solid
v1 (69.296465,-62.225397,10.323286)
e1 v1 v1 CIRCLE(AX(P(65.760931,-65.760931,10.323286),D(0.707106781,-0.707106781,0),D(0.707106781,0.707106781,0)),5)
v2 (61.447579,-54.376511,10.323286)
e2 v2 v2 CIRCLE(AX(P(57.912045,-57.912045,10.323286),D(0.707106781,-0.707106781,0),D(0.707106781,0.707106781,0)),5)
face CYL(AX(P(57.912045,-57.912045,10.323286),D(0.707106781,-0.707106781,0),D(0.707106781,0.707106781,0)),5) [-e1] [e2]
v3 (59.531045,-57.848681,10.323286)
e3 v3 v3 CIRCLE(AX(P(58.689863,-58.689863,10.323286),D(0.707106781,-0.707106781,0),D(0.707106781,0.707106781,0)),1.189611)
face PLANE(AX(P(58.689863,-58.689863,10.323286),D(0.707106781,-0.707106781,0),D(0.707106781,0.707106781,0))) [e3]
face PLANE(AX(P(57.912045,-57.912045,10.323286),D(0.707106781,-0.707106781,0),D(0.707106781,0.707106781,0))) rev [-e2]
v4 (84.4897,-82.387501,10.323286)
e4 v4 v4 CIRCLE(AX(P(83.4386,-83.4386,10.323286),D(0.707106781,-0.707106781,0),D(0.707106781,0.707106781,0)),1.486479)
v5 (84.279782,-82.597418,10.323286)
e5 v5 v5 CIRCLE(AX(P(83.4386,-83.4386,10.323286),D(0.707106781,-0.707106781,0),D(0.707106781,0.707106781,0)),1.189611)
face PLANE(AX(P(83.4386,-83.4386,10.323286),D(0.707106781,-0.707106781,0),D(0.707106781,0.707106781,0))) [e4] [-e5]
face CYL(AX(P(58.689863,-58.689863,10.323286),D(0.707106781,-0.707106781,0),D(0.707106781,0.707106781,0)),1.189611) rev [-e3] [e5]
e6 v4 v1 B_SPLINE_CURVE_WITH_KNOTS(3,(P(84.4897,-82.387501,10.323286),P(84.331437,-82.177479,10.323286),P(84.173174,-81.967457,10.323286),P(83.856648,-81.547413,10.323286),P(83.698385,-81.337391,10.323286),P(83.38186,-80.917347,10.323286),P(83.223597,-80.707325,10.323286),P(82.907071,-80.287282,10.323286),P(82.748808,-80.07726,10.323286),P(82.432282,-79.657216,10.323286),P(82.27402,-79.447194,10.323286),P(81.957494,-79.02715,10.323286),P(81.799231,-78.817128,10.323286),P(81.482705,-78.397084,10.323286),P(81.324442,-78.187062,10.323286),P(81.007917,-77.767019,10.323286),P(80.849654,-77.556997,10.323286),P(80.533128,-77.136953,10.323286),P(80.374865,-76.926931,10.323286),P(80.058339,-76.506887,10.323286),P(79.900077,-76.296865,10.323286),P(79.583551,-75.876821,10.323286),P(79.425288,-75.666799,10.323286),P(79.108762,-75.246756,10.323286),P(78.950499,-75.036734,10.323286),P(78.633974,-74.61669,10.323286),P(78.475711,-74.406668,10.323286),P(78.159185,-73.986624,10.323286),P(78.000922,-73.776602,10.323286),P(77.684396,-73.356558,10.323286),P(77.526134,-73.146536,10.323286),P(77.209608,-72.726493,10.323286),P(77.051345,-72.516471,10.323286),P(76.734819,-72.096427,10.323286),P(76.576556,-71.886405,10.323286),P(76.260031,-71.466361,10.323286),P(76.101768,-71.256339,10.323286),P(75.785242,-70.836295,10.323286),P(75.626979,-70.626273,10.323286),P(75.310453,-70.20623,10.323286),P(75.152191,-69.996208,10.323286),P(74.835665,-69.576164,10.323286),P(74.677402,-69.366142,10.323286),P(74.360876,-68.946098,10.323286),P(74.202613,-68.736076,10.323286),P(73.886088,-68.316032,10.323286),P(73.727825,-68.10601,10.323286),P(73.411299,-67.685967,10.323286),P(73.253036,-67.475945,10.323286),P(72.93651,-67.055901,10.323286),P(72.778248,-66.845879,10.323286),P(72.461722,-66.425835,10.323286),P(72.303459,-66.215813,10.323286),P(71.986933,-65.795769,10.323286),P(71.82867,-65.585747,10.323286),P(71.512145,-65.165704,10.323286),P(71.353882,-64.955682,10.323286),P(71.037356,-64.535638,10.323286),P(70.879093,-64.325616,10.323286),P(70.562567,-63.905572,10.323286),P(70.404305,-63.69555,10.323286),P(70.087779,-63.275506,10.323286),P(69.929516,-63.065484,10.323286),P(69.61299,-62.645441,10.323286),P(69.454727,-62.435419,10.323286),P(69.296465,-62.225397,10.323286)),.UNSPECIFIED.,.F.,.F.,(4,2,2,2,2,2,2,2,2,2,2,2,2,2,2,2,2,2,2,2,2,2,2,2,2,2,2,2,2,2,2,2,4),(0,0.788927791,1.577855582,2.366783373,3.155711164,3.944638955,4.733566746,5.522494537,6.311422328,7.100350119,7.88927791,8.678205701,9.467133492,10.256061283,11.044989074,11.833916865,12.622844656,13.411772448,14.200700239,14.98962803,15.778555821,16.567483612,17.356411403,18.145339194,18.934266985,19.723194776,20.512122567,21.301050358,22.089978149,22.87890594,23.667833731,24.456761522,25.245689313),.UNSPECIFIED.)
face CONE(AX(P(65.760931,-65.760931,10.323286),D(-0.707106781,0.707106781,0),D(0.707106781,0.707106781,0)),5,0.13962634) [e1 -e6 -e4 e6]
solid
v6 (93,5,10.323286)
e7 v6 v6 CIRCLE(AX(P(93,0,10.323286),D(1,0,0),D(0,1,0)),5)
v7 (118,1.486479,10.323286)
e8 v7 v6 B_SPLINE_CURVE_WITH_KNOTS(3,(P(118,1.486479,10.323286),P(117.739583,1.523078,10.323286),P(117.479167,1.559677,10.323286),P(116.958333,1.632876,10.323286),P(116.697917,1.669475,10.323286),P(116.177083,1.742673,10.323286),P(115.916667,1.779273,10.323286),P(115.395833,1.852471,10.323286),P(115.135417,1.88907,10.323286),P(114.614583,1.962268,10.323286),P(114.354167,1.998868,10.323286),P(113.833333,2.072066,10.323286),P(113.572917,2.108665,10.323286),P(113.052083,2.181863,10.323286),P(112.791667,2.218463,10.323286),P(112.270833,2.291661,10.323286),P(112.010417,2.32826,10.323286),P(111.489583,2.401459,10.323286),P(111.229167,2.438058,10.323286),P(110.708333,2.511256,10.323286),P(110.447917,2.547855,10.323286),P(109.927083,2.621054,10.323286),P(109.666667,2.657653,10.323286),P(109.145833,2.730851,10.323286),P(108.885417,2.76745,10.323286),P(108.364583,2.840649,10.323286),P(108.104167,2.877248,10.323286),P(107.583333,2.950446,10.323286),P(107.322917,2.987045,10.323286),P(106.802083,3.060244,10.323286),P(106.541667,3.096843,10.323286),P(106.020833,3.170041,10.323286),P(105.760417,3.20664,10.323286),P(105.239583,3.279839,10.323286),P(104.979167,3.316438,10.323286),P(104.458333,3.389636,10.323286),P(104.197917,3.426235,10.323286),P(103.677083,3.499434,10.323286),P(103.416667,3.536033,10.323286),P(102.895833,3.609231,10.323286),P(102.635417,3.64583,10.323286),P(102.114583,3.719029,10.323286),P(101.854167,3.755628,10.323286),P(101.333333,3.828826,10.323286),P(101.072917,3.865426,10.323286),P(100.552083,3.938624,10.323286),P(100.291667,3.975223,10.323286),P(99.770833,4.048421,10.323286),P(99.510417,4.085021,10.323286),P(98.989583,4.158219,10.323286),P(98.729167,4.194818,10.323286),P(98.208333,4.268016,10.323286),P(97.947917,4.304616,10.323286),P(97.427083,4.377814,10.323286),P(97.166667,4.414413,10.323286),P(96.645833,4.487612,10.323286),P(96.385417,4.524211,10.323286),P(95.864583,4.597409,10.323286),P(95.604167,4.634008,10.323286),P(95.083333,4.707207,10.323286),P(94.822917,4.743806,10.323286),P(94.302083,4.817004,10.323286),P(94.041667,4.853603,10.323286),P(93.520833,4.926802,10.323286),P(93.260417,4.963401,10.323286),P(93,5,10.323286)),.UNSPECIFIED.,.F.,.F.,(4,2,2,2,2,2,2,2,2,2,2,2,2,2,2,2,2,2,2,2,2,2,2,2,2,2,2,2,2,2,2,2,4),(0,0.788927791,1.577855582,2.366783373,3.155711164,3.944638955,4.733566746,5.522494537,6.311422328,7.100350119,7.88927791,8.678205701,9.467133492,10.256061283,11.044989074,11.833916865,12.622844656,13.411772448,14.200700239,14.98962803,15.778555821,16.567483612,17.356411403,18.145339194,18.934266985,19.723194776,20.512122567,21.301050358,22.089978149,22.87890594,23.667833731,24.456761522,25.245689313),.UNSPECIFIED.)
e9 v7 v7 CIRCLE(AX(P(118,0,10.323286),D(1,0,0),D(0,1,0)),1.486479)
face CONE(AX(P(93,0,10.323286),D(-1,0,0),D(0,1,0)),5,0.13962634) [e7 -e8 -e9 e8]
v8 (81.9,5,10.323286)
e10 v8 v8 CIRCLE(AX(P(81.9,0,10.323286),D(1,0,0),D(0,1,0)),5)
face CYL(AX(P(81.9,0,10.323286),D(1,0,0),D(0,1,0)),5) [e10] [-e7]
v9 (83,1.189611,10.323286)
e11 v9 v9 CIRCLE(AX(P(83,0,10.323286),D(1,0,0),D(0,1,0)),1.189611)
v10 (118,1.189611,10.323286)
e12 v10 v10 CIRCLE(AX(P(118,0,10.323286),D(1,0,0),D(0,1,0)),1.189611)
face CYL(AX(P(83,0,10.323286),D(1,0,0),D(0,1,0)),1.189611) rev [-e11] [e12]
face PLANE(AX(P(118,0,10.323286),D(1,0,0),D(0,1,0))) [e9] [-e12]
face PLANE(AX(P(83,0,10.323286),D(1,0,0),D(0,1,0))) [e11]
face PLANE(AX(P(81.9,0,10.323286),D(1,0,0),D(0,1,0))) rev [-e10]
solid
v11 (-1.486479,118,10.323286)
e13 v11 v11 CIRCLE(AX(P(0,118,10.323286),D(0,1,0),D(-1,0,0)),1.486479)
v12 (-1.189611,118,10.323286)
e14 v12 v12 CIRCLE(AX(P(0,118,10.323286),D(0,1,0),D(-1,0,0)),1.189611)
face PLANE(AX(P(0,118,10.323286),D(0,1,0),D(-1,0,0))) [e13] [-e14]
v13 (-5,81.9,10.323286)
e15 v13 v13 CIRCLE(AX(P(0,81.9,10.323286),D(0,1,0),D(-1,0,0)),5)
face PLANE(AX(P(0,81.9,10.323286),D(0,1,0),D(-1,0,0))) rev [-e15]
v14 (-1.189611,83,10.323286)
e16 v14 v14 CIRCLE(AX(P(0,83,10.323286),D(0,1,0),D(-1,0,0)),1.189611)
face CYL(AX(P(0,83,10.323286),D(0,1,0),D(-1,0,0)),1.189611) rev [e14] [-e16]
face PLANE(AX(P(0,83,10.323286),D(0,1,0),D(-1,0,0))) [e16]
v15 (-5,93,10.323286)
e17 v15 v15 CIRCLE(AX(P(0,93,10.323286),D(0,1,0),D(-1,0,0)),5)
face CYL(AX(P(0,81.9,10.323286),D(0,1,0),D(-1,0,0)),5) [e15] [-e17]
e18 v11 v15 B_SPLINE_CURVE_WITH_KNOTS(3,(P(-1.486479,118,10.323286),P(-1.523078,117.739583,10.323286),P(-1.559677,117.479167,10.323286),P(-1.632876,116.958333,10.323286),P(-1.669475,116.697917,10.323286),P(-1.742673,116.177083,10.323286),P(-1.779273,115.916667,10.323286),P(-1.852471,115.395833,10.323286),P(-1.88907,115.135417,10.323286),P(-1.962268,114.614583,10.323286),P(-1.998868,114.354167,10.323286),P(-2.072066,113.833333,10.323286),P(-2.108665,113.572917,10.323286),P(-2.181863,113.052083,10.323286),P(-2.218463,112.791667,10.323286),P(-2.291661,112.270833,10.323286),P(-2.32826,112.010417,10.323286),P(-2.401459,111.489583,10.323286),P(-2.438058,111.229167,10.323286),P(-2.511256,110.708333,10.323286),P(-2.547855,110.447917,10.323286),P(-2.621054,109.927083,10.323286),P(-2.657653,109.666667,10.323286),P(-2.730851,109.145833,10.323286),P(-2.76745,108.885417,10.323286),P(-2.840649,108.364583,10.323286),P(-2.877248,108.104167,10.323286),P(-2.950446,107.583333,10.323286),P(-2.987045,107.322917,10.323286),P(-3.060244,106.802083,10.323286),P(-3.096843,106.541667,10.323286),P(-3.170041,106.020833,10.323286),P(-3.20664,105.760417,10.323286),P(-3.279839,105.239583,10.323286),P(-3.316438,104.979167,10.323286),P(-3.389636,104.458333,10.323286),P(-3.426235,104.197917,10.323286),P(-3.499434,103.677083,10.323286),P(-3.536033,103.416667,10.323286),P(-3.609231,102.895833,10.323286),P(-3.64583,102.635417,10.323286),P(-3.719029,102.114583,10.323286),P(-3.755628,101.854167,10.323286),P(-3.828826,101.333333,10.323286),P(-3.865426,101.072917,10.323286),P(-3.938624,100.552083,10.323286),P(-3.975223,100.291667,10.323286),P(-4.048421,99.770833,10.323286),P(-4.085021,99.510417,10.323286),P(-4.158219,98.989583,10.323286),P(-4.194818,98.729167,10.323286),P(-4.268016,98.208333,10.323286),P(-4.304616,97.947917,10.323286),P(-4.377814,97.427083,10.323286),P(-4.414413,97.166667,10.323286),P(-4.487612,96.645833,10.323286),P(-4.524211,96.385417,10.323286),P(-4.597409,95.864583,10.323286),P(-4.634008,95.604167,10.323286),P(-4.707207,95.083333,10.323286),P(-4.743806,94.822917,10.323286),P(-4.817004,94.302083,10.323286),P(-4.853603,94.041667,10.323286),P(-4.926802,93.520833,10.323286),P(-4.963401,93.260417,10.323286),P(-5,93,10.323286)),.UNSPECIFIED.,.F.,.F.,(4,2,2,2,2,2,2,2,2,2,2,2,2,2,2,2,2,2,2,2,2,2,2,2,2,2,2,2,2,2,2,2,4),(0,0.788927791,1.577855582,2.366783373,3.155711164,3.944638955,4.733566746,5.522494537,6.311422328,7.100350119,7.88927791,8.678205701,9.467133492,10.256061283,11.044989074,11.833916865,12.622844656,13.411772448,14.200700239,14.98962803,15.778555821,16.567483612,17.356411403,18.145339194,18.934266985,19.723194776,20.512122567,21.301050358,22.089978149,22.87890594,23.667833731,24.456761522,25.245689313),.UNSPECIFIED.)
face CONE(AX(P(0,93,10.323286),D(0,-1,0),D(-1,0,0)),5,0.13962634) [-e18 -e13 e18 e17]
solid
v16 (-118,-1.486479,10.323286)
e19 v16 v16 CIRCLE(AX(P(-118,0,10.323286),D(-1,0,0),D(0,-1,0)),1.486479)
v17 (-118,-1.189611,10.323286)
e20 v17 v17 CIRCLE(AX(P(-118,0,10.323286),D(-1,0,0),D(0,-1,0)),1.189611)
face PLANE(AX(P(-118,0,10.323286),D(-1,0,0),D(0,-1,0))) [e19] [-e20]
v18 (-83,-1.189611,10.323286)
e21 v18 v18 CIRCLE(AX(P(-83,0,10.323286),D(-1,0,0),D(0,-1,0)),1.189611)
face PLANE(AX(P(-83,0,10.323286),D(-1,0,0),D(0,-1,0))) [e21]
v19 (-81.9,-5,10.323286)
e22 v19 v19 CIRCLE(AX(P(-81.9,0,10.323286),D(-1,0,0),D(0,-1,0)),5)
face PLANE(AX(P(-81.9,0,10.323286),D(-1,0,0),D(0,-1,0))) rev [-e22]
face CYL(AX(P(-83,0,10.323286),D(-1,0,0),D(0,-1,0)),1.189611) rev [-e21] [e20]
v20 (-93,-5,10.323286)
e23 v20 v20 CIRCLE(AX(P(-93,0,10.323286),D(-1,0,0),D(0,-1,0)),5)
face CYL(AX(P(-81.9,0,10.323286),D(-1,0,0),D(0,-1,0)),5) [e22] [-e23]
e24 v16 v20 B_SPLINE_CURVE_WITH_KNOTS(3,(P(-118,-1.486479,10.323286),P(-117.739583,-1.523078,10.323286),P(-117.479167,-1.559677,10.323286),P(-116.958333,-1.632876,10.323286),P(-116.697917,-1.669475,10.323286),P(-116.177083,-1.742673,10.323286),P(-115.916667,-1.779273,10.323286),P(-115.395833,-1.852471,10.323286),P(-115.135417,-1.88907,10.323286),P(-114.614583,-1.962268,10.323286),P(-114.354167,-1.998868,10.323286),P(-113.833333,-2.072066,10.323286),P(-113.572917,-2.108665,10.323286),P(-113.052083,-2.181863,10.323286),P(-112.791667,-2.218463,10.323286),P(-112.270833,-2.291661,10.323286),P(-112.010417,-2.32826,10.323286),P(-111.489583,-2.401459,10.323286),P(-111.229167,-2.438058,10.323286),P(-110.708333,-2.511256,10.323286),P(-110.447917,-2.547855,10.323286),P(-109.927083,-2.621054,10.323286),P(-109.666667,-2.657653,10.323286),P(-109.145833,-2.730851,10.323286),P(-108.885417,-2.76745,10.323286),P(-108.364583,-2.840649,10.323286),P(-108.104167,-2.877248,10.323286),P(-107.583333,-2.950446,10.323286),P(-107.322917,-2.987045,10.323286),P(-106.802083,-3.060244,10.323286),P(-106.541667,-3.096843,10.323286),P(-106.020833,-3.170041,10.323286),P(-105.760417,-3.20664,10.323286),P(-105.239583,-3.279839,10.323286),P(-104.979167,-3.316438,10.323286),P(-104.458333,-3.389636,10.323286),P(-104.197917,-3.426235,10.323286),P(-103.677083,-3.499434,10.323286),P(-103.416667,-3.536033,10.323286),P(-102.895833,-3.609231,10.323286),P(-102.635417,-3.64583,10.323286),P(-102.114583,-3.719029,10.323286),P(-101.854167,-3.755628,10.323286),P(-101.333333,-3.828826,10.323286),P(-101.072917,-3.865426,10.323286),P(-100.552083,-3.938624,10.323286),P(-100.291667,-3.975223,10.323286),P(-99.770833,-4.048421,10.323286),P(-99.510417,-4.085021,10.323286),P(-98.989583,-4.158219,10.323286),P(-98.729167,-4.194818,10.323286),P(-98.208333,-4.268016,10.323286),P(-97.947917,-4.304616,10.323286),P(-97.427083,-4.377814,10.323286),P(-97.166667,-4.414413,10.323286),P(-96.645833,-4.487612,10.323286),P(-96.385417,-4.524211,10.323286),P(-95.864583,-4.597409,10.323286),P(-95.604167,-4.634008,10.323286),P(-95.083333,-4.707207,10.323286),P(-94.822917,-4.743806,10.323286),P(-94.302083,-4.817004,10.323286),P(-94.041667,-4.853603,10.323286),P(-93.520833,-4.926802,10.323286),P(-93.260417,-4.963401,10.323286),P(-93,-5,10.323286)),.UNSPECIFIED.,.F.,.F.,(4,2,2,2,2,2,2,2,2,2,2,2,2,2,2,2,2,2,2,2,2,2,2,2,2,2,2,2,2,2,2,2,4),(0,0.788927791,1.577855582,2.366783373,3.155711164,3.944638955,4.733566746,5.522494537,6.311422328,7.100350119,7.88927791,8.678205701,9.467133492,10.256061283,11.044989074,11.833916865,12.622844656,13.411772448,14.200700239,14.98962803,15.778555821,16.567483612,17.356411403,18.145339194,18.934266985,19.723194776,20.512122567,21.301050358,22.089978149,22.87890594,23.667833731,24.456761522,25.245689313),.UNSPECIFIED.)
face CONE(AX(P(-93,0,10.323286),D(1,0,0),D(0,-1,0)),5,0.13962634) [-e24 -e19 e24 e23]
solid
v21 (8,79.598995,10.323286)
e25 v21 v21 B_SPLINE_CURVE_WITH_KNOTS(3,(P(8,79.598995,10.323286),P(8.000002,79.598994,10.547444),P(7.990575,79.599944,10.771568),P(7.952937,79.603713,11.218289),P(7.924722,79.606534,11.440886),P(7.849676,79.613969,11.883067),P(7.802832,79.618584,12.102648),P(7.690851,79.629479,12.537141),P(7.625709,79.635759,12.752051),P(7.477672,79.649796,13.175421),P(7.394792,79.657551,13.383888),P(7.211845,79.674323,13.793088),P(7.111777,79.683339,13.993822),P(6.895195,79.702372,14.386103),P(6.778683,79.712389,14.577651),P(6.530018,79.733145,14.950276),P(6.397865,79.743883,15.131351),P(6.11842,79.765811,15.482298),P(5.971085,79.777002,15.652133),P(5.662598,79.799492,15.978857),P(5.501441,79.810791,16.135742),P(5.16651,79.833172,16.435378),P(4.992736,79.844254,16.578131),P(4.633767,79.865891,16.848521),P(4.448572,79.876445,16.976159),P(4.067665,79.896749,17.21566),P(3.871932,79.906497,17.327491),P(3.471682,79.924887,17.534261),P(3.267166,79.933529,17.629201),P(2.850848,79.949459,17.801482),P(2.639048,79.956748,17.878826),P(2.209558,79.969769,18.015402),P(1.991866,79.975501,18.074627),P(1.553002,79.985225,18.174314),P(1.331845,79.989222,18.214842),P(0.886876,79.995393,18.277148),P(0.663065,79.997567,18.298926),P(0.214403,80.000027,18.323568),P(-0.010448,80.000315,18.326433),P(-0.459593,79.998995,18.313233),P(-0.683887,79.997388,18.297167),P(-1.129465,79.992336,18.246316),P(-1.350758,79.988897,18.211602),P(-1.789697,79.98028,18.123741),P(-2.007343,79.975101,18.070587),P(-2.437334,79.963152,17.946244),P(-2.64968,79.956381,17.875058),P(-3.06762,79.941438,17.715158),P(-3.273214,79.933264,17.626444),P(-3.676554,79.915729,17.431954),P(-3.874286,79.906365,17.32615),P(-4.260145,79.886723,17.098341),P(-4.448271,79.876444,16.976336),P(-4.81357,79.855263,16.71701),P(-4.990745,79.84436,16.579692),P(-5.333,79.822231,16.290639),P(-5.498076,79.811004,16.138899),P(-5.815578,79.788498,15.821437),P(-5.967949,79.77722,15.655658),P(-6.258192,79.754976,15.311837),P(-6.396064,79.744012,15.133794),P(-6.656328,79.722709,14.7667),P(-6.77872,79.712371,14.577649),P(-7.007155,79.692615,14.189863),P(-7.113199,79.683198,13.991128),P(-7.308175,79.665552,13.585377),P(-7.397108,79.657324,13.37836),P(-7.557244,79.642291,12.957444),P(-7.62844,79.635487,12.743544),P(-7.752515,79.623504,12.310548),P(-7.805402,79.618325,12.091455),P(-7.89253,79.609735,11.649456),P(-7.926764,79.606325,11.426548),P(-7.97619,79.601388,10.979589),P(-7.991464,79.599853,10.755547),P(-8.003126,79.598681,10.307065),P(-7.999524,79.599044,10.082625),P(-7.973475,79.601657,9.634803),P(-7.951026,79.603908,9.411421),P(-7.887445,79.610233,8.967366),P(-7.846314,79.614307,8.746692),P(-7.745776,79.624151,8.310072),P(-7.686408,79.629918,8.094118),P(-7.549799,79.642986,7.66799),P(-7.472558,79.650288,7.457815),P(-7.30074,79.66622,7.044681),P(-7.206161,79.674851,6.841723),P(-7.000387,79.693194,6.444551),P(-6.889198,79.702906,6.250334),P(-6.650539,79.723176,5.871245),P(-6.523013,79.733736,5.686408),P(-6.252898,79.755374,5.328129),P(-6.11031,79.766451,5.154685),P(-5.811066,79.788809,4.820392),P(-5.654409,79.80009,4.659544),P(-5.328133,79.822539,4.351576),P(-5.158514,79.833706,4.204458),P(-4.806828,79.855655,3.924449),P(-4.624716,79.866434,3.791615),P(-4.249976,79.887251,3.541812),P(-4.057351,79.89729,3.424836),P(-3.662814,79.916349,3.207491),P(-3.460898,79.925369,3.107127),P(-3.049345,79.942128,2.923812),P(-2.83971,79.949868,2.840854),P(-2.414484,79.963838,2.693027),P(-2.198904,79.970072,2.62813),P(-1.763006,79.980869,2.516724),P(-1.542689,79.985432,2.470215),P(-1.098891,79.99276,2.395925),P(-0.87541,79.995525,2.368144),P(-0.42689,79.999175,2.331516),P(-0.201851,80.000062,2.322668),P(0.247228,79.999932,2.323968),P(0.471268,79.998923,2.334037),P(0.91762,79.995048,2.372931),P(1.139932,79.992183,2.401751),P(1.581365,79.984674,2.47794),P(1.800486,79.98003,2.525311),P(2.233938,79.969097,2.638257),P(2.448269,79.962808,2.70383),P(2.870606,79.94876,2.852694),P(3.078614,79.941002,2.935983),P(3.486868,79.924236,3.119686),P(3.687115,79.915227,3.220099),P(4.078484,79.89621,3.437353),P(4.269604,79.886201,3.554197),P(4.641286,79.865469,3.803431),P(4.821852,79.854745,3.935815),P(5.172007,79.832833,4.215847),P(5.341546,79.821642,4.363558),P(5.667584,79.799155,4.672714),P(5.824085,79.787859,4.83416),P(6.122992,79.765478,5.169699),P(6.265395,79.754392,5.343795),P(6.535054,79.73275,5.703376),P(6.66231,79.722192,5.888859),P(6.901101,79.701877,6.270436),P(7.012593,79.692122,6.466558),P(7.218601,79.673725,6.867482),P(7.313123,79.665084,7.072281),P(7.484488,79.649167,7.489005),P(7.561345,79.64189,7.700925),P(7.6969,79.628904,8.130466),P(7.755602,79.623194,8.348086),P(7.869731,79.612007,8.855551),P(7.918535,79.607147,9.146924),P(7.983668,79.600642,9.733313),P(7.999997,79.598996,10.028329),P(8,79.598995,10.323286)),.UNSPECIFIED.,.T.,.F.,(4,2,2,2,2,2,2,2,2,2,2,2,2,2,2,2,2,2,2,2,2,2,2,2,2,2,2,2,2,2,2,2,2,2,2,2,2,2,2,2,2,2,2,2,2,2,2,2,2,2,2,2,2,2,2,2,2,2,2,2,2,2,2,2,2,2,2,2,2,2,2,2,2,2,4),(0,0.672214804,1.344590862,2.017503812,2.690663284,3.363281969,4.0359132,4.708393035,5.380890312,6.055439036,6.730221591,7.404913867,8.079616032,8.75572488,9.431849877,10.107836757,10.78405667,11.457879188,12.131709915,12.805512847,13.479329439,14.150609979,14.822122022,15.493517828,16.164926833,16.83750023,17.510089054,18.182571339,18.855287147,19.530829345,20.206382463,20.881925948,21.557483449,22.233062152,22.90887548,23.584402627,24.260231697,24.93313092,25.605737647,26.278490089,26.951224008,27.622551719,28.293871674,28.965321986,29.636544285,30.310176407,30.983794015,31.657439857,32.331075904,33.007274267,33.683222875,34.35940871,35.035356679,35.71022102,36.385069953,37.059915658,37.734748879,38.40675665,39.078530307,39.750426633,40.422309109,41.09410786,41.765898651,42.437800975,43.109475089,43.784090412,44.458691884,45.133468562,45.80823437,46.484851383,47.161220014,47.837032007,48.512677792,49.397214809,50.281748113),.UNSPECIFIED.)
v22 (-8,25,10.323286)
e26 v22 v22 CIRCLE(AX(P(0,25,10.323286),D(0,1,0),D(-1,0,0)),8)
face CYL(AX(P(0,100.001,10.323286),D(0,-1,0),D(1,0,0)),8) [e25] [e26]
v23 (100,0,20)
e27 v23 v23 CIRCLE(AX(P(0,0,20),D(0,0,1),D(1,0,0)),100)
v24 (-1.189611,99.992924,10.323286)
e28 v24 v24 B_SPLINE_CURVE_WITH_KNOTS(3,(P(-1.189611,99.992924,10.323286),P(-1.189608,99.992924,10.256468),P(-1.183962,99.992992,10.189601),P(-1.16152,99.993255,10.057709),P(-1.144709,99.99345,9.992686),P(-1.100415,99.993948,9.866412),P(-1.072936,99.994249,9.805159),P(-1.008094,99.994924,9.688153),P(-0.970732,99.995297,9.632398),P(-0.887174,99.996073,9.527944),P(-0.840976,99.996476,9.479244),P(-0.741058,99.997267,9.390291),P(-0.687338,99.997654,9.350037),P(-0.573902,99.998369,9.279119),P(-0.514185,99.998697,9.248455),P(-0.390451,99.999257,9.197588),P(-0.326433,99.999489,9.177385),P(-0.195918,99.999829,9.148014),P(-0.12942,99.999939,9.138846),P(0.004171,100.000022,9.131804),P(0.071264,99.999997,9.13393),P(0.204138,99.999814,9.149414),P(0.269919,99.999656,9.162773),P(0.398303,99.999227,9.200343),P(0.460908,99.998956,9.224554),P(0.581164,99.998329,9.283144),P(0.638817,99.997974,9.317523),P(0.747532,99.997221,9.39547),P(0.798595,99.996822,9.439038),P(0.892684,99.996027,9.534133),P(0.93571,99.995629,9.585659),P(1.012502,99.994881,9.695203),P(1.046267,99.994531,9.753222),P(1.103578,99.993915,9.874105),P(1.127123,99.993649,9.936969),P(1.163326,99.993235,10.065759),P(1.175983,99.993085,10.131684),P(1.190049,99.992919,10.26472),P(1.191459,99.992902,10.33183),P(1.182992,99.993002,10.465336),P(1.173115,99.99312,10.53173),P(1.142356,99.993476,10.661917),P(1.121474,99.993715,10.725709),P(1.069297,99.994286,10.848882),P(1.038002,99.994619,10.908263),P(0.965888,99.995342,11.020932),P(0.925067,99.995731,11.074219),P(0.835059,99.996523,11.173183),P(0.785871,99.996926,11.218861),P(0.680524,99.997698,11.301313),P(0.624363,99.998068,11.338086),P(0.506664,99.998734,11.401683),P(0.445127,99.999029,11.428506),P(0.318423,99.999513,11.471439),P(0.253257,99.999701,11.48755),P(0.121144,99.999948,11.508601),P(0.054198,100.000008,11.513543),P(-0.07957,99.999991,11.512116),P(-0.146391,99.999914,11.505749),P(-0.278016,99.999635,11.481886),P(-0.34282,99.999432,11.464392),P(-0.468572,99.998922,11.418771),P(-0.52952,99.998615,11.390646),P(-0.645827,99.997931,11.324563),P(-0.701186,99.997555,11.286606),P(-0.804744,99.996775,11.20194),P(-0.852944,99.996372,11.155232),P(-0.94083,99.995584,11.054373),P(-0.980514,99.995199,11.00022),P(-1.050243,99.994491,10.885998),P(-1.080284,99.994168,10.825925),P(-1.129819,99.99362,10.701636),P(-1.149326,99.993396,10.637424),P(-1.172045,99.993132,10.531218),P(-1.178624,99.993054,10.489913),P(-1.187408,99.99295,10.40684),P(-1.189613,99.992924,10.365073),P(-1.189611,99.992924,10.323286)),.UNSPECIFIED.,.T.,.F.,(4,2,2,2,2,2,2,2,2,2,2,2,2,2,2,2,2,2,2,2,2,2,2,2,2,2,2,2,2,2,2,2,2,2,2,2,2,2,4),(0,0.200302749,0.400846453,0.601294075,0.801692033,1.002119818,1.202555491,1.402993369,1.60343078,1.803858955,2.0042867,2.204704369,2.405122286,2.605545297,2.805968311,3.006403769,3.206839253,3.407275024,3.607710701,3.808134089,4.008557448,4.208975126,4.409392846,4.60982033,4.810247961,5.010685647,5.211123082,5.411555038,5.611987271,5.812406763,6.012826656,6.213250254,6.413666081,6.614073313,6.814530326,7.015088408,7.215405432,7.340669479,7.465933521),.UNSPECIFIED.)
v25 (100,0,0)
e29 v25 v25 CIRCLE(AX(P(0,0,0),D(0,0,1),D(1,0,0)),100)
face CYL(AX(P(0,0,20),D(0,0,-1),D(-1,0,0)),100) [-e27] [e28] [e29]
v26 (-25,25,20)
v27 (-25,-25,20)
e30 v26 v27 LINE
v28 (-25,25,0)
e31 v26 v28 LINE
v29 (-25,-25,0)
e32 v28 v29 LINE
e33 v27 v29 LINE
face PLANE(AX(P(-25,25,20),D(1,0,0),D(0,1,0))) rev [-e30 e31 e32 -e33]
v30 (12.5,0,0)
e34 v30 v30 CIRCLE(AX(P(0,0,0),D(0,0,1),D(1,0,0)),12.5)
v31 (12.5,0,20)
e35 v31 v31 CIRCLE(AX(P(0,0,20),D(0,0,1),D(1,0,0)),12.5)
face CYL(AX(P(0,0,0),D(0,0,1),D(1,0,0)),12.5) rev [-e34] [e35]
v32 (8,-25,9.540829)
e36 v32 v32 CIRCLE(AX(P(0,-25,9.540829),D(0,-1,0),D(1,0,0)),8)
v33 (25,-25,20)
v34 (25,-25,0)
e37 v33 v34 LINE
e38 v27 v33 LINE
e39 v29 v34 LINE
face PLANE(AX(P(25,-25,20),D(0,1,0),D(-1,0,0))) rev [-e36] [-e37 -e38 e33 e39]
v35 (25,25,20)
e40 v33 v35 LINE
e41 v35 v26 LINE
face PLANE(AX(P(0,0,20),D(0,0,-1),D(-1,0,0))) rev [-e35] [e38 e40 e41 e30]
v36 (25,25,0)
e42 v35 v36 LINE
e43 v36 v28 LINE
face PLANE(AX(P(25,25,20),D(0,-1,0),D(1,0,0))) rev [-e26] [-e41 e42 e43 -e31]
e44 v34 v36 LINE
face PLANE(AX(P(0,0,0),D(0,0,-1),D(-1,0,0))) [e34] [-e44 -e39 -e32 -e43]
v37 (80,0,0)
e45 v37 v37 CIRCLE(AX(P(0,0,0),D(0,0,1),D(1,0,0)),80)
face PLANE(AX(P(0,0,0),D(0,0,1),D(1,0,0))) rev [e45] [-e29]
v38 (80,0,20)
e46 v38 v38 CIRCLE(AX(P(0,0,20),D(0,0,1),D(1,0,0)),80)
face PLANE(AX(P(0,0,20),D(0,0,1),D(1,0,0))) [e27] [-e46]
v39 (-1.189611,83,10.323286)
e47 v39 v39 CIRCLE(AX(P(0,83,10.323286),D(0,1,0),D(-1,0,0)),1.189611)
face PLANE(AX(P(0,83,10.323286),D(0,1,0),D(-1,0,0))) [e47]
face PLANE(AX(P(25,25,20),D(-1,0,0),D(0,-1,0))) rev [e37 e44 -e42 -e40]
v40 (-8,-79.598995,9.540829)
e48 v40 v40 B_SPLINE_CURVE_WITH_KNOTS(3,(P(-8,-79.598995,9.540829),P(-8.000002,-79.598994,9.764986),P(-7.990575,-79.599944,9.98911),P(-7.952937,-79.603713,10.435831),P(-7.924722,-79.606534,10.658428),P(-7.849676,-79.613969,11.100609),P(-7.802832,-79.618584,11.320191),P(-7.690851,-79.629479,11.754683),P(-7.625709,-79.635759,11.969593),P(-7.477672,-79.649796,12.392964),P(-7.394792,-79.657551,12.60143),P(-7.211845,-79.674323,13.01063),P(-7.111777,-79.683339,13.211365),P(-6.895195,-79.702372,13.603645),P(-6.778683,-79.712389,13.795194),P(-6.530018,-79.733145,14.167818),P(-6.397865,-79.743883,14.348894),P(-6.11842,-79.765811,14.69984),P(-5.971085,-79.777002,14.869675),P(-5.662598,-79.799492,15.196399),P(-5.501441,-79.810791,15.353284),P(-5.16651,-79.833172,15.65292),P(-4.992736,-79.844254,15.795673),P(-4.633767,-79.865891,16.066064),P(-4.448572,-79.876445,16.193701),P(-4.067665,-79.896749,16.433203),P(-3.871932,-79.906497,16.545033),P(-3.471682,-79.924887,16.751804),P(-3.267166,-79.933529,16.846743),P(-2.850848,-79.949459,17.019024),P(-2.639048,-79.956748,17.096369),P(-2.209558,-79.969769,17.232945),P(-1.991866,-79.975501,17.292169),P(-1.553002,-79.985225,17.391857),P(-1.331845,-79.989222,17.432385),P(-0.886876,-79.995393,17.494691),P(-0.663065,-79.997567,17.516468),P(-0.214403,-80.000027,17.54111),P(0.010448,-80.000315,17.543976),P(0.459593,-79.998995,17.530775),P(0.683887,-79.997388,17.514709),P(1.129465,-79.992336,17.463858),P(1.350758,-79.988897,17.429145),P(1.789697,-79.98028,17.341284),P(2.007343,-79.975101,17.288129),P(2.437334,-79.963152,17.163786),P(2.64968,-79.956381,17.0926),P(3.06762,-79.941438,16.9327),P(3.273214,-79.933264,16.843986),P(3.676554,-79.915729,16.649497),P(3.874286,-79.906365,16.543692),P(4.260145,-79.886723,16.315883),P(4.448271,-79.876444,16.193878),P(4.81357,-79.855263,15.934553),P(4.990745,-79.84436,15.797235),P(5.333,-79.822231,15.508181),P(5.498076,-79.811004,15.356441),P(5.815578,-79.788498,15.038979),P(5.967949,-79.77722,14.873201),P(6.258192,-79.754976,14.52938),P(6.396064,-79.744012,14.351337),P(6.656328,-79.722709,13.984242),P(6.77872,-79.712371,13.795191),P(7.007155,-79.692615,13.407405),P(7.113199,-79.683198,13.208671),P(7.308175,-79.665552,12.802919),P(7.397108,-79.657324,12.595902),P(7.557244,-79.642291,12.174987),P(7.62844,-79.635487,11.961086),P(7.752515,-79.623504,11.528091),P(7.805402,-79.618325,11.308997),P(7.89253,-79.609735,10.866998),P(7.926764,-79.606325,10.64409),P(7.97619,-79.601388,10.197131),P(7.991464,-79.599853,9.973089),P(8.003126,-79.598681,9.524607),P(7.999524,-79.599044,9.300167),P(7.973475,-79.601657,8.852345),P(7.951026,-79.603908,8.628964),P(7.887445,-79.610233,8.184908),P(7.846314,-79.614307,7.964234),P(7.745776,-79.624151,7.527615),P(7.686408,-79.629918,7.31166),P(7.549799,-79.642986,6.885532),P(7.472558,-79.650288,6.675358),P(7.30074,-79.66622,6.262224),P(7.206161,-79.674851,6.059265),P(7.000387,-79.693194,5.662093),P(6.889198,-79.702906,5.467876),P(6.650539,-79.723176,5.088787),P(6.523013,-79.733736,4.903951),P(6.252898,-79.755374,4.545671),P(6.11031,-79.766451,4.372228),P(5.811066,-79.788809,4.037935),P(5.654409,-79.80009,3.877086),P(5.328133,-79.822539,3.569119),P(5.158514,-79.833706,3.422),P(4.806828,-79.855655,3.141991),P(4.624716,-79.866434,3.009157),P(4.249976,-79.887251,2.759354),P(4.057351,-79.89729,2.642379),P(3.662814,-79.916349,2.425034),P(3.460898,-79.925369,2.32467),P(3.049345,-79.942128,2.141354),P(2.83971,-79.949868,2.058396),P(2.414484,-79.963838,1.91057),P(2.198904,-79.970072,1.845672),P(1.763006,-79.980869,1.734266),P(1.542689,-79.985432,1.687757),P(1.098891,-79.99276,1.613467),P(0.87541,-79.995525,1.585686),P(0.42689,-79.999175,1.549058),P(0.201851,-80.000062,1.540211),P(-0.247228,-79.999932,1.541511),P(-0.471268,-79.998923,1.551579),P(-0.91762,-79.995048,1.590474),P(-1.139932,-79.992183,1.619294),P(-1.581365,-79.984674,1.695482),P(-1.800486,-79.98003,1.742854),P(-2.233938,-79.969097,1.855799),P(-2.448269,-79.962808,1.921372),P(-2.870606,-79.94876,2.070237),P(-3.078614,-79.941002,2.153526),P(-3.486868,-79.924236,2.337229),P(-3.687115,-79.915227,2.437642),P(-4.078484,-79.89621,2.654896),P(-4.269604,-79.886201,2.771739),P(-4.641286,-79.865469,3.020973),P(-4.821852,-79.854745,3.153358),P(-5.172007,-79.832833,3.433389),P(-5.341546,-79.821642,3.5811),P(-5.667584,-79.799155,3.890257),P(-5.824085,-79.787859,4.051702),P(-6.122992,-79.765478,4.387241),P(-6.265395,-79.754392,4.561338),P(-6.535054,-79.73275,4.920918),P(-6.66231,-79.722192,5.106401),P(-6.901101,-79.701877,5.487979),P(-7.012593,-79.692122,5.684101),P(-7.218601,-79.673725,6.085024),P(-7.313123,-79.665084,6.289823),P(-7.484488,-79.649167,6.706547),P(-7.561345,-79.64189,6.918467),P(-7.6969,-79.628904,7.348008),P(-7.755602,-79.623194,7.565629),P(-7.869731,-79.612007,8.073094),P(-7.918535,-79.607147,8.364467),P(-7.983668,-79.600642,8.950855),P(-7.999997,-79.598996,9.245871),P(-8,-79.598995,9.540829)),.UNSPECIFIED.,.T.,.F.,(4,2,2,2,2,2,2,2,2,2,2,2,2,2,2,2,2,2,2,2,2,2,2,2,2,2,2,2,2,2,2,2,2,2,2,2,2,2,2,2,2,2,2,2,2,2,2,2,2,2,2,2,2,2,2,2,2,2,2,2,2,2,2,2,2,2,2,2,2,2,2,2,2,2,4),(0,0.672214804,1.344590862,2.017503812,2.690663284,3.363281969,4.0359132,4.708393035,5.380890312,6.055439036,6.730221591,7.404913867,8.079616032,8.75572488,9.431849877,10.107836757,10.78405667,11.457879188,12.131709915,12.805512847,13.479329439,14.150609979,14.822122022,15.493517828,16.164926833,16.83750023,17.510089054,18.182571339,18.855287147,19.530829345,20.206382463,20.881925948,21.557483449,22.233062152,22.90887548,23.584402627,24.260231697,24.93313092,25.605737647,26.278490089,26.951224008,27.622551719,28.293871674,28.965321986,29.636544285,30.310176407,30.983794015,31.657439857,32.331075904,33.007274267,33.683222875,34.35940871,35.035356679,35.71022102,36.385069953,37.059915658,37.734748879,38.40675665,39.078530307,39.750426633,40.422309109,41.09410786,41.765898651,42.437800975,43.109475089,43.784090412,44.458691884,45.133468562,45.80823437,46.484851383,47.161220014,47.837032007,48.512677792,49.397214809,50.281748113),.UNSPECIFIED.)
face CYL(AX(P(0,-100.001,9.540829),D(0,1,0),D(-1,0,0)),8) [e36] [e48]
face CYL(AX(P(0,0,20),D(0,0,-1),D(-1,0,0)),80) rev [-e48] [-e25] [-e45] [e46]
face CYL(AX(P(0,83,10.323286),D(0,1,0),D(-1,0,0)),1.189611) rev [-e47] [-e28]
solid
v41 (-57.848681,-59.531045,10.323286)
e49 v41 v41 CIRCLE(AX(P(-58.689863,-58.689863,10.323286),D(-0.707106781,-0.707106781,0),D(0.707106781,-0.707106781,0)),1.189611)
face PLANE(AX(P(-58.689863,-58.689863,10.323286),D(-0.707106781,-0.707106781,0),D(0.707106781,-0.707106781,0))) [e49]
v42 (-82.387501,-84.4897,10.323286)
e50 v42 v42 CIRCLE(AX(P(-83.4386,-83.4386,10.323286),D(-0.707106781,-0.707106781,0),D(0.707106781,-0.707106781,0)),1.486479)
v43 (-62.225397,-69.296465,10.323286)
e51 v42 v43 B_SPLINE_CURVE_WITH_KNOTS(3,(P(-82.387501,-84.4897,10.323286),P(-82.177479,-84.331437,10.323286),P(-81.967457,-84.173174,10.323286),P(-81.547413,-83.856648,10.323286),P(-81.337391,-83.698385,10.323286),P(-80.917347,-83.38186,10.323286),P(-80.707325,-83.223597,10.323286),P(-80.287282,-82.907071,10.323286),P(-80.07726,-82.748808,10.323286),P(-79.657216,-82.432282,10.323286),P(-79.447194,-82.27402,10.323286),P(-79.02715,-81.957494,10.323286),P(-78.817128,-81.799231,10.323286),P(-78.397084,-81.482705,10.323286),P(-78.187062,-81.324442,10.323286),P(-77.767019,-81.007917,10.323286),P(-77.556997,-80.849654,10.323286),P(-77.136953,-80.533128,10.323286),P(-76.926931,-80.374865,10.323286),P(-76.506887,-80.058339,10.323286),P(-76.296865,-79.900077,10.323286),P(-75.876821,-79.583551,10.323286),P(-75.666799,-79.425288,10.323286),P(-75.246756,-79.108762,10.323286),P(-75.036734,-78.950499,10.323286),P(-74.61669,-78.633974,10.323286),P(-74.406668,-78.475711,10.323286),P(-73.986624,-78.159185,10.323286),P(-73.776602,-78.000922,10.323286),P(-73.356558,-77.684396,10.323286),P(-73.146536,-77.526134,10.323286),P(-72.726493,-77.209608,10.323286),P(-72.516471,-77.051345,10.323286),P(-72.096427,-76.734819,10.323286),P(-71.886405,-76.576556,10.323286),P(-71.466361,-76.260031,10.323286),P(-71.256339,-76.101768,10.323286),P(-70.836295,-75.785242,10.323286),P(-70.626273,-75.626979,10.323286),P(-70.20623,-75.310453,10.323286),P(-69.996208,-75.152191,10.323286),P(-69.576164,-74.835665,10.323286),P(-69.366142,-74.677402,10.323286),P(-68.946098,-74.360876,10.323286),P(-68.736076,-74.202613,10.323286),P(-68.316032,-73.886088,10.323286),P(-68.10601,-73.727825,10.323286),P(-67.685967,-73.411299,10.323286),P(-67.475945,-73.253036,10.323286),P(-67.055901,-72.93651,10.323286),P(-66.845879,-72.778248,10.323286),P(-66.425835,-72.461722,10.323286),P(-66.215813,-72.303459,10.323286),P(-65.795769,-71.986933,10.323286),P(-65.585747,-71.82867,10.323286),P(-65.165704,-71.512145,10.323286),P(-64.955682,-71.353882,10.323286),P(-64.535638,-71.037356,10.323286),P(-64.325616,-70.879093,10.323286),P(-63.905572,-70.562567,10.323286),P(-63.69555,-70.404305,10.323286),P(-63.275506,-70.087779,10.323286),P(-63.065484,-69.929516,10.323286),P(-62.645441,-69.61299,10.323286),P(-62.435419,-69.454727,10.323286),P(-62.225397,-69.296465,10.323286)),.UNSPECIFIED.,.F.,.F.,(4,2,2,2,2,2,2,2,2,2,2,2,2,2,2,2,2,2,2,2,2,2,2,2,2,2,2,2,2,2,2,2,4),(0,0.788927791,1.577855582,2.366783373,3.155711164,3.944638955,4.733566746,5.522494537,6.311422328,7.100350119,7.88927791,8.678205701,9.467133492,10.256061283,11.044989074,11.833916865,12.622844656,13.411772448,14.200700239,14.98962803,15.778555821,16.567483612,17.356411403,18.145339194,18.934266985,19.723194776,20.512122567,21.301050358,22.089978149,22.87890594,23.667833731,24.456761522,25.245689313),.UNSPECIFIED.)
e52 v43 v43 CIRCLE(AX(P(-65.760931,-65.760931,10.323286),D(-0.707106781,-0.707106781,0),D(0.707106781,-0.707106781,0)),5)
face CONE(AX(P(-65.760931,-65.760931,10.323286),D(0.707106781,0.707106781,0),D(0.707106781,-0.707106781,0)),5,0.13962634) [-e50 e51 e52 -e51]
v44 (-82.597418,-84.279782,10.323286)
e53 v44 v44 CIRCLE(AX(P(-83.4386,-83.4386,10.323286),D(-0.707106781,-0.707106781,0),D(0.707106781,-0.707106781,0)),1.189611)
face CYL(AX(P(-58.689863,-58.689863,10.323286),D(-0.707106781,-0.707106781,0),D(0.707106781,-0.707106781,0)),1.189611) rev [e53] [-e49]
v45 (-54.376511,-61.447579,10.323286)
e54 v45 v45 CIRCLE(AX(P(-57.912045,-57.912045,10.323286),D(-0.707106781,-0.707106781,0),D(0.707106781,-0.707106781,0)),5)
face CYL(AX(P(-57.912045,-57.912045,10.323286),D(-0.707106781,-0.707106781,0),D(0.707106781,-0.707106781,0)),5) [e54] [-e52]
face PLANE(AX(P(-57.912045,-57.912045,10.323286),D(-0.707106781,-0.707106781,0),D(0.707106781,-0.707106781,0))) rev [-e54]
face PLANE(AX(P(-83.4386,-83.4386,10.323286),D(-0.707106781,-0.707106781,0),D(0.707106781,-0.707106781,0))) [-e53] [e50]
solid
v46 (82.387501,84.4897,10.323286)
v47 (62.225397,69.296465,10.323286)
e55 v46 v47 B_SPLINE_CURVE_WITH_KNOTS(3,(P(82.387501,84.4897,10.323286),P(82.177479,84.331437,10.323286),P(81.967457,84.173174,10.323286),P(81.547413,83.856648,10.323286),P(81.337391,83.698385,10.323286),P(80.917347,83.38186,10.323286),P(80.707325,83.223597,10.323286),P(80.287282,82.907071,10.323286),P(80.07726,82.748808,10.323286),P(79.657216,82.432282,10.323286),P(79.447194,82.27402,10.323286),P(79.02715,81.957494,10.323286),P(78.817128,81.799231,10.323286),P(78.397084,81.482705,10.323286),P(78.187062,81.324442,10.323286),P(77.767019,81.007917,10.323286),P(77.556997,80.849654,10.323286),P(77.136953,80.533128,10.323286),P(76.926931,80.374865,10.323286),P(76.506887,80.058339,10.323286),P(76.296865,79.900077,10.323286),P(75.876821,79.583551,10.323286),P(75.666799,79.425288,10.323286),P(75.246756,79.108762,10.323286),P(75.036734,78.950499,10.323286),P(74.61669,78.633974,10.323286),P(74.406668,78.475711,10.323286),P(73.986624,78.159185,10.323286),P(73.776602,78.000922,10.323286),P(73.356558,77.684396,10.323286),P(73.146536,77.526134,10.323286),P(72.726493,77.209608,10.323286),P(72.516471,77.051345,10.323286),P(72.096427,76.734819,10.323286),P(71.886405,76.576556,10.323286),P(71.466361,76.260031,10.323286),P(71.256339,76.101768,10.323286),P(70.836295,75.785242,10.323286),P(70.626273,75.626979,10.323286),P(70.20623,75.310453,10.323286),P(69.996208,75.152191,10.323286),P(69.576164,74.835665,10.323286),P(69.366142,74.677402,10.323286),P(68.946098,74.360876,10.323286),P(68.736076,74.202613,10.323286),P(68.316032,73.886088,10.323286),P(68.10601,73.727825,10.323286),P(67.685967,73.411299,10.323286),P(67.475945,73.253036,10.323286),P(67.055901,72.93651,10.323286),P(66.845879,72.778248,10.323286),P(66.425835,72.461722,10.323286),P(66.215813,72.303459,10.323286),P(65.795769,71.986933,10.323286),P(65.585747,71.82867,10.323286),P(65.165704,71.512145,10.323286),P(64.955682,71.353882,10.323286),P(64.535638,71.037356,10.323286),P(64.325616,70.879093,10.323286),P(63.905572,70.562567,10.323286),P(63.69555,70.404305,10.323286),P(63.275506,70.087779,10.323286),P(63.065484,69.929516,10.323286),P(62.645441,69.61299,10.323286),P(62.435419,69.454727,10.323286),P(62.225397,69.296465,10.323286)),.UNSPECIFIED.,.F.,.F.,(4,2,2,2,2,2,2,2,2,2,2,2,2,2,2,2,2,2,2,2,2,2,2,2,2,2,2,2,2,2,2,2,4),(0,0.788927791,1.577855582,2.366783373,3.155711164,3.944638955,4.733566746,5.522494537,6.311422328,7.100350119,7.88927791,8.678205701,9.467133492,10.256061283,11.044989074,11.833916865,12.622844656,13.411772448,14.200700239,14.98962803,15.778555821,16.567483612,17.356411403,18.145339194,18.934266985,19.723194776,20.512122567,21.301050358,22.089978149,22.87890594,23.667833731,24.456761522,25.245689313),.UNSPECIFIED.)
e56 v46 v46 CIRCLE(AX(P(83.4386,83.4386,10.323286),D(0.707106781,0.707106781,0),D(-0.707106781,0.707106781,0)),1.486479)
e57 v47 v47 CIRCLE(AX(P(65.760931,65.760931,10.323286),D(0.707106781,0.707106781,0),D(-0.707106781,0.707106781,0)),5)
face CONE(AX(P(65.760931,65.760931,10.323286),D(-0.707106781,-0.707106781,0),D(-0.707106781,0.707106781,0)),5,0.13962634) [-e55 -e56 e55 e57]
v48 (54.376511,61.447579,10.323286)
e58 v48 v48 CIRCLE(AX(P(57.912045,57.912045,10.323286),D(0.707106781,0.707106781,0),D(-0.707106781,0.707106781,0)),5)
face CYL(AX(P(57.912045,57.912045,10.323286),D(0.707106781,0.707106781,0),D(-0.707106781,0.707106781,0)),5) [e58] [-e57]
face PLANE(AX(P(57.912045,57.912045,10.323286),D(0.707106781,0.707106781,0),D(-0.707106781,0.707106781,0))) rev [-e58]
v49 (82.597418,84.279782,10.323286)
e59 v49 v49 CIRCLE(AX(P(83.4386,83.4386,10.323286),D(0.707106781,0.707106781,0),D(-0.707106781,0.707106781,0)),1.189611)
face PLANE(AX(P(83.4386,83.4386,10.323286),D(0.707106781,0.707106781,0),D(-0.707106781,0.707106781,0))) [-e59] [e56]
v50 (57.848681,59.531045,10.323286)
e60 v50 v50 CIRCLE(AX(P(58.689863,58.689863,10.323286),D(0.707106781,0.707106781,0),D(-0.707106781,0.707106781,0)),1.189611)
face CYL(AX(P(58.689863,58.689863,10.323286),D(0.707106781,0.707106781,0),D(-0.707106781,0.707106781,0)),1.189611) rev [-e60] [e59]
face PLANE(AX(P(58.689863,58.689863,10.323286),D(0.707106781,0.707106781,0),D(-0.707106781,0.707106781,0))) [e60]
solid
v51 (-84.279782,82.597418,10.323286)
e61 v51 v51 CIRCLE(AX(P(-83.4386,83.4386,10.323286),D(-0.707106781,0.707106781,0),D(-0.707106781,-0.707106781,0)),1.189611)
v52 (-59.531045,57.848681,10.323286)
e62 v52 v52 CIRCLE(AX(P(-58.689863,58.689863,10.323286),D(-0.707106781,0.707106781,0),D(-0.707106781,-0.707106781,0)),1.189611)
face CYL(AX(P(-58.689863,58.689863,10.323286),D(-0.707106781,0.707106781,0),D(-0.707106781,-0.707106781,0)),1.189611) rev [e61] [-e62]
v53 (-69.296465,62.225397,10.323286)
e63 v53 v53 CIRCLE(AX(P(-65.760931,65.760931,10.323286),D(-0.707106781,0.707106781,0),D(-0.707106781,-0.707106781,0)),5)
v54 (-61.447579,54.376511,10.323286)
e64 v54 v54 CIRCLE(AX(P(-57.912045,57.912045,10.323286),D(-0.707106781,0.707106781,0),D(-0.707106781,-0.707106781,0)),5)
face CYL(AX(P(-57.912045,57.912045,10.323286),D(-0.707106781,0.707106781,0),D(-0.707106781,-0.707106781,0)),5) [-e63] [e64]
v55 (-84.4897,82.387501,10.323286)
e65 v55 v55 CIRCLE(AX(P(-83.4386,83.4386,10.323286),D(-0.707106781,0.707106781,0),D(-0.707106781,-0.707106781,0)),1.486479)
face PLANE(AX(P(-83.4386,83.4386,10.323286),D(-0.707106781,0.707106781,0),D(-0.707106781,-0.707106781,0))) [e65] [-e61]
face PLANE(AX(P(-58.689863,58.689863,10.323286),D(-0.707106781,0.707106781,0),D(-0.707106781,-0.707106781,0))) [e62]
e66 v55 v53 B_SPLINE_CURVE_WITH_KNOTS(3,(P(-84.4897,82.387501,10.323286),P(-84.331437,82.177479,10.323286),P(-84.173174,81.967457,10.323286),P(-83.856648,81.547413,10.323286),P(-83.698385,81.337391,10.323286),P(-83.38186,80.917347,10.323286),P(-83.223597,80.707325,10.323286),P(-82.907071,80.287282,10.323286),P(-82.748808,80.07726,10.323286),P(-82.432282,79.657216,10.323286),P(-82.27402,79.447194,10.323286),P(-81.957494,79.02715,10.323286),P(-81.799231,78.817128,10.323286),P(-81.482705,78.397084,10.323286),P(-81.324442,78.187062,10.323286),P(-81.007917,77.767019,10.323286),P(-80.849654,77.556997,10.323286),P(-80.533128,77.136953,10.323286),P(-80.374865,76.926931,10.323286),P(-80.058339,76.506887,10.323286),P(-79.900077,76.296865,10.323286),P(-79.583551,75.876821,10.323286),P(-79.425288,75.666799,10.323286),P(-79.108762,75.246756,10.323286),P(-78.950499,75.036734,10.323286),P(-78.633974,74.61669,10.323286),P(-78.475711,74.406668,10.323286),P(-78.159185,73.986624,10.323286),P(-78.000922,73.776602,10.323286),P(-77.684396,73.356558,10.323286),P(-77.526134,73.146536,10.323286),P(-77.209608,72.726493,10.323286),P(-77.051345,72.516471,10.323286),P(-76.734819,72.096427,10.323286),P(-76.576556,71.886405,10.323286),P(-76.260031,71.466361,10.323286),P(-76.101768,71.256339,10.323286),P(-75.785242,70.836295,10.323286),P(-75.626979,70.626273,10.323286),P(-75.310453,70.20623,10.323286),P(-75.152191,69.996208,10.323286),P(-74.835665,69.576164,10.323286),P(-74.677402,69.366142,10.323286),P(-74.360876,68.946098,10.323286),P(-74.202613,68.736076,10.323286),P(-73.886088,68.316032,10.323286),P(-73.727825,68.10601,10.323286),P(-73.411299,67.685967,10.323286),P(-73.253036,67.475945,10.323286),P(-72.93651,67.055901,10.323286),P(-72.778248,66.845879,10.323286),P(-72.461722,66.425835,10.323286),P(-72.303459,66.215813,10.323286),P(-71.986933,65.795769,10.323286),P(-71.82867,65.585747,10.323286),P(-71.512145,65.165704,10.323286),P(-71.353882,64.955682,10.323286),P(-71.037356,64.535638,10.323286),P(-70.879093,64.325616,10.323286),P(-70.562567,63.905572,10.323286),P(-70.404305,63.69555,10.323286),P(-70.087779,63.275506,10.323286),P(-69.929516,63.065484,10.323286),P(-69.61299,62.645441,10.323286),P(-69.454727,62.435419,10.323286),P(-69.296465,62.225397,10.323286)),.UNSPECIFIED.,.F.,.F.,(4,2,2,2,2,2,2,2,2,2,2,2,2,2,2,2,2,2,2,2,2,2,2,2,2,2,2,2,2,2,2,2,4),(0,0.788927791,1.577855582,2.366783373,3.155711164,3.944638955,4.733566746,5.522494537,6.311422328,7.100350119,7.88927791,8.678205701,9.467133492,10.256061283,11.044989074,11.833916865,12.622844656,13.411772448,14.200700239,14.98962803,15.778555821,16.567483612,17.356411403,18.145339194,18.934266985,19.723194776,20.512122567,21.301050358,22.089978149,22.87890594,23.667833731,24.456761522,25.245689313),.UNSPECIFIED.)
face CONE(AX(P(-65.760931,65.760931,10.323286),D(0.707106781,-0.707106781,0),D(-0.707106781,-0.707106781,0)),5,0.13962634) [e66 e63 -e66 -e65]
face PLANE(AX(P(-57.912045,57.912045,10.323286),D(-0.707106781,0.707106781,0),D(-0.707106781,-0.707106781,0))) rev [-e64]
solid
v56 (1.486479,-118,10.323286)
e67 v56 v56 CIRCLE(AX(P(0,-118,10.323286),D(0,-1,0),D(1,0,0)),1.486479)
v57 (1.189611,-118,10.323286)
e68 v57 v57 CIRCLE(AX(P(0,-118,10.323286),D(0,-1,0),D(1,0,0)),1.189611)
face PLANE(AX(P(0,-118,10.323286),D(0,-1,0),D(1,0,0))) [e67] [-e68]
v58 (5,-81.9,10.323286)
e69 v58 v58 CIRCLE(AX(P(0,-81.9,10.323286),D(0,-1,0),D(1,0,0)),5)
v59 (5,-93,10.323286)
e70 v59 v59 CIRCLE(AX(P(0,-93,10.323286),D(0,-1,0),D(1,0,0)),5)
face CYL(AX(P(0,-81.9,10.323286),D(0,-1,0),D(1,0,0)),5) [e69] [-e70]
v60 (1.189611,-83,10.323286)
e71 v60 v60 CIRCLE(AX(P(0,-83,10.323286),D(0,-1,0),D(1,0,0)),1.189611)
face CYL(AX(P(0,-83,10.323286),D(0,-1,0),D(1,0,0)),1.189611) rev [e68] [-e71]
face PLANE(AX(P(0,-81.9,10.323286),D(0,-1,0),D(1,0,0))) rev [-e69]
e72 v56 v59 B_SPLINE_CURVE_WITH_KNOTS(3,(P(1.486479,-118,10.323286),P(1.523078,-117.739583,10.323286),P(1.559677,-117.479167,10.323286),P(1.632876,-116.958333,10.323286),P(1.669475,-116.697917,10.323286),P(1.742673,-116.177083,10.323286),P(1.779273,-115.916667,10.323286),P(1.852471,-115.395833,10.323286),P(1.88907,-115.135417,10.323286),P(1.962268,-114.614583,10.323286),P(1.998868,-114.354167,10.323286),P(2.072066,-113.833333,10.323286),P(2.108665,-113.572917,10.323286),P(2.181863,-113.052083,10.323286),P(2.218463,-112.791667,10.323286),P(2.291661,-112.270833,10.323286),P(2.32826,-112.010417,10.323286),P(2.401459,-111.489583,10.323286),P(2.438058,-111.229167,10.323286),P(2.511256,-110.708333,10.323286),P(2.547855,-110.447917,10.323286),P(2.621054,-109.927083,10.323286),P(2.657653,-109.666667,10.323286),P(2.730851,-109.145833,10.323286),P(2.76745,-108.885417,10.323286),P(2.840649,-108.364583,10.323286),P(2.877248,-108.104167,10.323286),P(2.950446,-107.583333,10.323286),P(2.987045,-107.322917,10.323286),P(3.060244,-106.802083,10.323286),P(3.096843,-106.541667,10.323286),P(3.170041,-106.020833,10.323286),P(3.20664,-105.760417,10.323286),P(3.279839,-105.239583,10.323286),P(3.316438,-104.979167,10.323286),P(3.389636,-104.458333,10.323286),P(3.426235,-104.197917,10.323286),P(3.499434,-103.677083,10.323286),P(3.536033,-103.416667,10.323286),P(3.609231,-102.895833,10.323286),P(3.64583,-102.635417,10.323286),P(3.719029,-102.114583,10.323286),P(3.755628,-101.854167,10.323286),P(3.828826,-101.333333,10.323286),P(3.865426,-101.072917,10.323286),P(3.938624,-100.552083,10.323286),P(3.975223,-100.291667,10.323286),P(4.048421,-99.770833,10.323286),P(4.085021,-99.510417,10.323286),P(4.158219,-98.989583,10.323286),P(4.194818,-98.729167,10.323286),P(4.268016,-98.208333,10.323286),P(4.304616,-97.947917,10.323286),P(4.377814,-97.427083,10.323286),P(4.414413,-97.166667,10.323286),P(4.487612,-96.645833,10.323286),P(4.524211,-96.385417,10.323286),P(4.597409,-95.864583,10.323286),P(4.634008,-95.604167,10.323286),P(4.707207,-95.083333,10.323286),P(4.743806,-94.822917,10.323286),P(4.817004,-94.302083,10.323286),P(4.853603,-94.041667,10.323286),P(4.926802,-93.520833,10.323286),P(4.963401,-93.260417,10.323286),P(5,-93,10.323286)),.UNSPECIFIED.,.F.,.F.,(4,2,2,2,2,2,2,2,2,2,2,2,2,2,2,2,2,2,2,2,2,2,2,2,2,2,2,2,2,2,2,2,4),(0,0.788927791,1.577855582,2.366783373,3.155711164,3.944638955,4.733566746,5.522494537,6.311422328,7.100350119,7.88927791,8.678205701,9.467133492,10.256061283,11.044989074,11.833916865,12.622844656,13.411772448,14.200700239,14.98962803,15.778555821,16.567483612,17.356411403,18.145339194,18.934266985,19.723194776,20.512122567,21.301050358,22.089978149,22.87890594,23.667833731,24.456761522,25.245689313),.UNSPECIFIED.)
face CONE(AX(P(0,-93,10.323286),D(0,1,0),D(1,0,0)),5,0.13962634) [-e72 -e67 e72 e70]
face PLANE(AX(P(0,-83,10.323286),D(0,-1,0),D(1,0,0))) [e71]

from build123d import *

# Parameters (mm, degrees)
SKETCH1_R                = 100
SKETCH1_R_2              = 80
BOSS_EXTRUDE1_DEPTH      = 20
SKETCH3_W                = 50
SKETCH3_H                = 50
BOSS_EXTRUDE2_DEPTH      = 20
BOSS_EXTRUDE3_REACH      = 163.323
BOSS_EXTRUDE3_END_RADIUS = 80
SKETCH4_R                = 8
BOSS_EXTRUDE4_REACH      = 163.323
BOSS_EXTRUDE4_END_RADIUS = 80
SKETCH5_R                = 8
SKETCH6_R                = 12.5
CUT_EXTRUDE1_DEPTH       = 20
SKETCH25_R               = 1.189610787
CUT_EXTRUDE4_DEPTH       = 35
CIRPATTERN4_COUNT        = 8


# Read off the part's stored shape, not the designer's step: Boss-Extrude7
with BuildPart() as part:
    # Sketch1 → Boss-Extrude1 (new body)
    with BuildSketch(Plane.XY):
        Circle(SKETCH1_R)
        Circle(SKETCH1_R_2, mode=Mode.SUBTRACT)
    extrude(amount=BOSS_EXTRUDE1_DEPTH)



with BuildPart() as body_2:
    # Sketch3 → Boss-Extrude2 (new body)
    with BuildSketch(Plane.XY):
        Rectangle(SKETCH3_W, SKETCH3_H)
    extrude(amount=BOSS_EXTRUDE2_DEPTH)


with BuildPart() as part_1:
    add(part.part)

    add(body_2.part)  # Boss-Extrude3 merges body 2
    # Boss-Extrude3: up to this cylinder (the profile starts inside it)
    boss_extrude3_end = Plane(origin=(0, 0, 10.323286), z_dir=(0, 0, -1)) * Cylinder(BOSS_EXTRUDE3_END_RADIUS, 487.646, mode=Mode.PRIVATE)
    # Sketch4 → Boss-Extrude3 (add, up to the surface)
    with BuildSketch(Plane(origin=(0, 25, 0), x_dir=(1, 0, 0), z_dir=(0, 1, 0)), mode=Mode.PRIVATE) as boss_extrude3_sk1:
        with Locations((0, -10.323286204)):
            Circle(SKETCH4_R)
    boss_extrude3_tool1 = extrude(boss_extrude3_sk1.sketch, amount=BOSS_EXTRUDE3_REACH, mode=Mode.PRIVATE) & boss_extrude3_end
    add(boss_extrude3_tool1.solids().sort_by_distance((0, 25, 10.323286))[0])

    # Boss-Extrude4: up to this cylinder (the profile starts inside it)
    boss_extrude4_end = Plane(origin=(0, 0, 9.540829), z_dir=(0, 0, -1)) * Cylinder(BOSS_EXTRUDE4_END_RADIUS, 487.646, mode=Mode.PRIVATE)
    # Sketch5 → Boss-Extrude4 (add, up to the surface)
    with BuildSketch(Plane.XZ.offset(25), mode=Mode.PRIVATE) as boss_extrude4_sk1:
        with Locations(Location((0, 9.540828597, 0), (0, 0, 180))):
            Circle(SKETCH5_R)
    boss_extrude4_tool1 = extrude(boss_extrude4_sk1.sketch, amount=BOSS_EXTRUDE4_REACH, mode=Mode.PRIVATE) & boss_extrude4_end
    add(boss_extrude4_tool1.solids().sort_by_distance((0, -25, 9.540829))[0])

    # Sketch6 → Cut-Extrude1 (cut)
    with BuildSketch(Plane.XY.offset(20)):
        Circle(SKETCH6_R)
    extrude(amount=-CUT_EXTRUDE1_DEPTH, mode=Mode.SUBTRACT)


with BuildPart() as body_2_2:
    # Boss-Extrude7 outline → Boss-Extrude7 (revolve)
    with BuildSketch(Plane.XY.offset(10.323286204)):
        Polygon((0, 81.9), (5, 81.9), (5, 93), (1.486479132, 118), (0, 118), align=None)
    revolve(axis=Axis((0, 0, 10.323286204), (0, 1, 0)))


with BuildPart() as cut_extrude4_tool:
    # Sketch25 → Cut-Extrude4 (new body)
    with BuildSketch(Plane(origin=(0, 118, 0), x_dir=(1, 0, 0), z_dir=(0, 1, 0))):
        with Locations(Location((0, -10.323286204, 0), (0, 0, 180))):
            Circle(SKETCH25_R)
    extrude(amount=-CUT_EXTRUDE4_DEPTH)


with BuildPart() as part_2:
    add(part_1.part)

    # Cut-Extrude4: cut by cut_extrude4_tool
    add(cut_extrude4_tool.part, mode=Mode.SUBTRACT)


with BuildPart() as body_2_2_1:
    add(body_2_2.part)

    # Cut-Extrude4: cut by cut_extrude4_tool
    add(cut_extrude4_tool.part, mode=Mode.SUBTRACT)


with BuildPart() as cirpattern4_1:
    # CirPattern4: pattern copy
    add(body_2_2_1.part.rotate(Axis((0, 0, 0), (0, 0, 1)), 1 * 360 / CIRPATTERN4_COUNT))


with BuildPart() as cirpattern4_2:
    # CirPattern4: pattern copy
    add(body_2_2_1.part.rotate(Axis((0, 0, 0), (0, 0, 1)), 2 * 360 / CIRPATTERN4_COUNT))


with BuildPart() as cirpattern4_3:
    # CirPattern4: pattern copy
    add(body_2_2_1.part.rotate(Axis((0, 0, 0), (0, 0, 1)), 3 * 360 / CIRPATTERN4_COUNT))


with BuildPart() as cirpattern4_4:
    # CirPattern4: pattern copy
    add(body_2_2_1.part.rotate(Axis((0, 0, 0), (0, 0, 1)), 4 * 360 / CIRPATTERN4_COUNT))


with BuildPart() as cirpattern4_5:
    # CirPattern4: pattern copy
    add(body_2_2_1.part.rotate(Axis((0, 0, 0), (0, 0, 1)), 5 * 360 / CIRPATTERN4_COUNT))


with BuildPart() as cirpattern4_6:
    # CirPattern4: pattern copy
    add(body_2_2_1.part.rotate(Axis((0, 0, 0), (0, 0, 1)), 6 * 360 / CIRPATTERN4_COUNT))


with BuildPart() as cirpattern4_7:
    # CirPattern4: pattern copy
    add(body_2_2_1.part.rotate(Axis((0, 0, 0), (0, 0, 1)), 7 * 360 / CIRPATTERN4_COUNT))


solid = Compound([part_2.part, body_2_2_1.part, cirpattern4_1.part, cirpattern4_2.part, cirpattern4_3.part, cirpattern4_4.part, cirpattern4_5.part, cirpattern4_6.part, cirpattern4_7.part])
